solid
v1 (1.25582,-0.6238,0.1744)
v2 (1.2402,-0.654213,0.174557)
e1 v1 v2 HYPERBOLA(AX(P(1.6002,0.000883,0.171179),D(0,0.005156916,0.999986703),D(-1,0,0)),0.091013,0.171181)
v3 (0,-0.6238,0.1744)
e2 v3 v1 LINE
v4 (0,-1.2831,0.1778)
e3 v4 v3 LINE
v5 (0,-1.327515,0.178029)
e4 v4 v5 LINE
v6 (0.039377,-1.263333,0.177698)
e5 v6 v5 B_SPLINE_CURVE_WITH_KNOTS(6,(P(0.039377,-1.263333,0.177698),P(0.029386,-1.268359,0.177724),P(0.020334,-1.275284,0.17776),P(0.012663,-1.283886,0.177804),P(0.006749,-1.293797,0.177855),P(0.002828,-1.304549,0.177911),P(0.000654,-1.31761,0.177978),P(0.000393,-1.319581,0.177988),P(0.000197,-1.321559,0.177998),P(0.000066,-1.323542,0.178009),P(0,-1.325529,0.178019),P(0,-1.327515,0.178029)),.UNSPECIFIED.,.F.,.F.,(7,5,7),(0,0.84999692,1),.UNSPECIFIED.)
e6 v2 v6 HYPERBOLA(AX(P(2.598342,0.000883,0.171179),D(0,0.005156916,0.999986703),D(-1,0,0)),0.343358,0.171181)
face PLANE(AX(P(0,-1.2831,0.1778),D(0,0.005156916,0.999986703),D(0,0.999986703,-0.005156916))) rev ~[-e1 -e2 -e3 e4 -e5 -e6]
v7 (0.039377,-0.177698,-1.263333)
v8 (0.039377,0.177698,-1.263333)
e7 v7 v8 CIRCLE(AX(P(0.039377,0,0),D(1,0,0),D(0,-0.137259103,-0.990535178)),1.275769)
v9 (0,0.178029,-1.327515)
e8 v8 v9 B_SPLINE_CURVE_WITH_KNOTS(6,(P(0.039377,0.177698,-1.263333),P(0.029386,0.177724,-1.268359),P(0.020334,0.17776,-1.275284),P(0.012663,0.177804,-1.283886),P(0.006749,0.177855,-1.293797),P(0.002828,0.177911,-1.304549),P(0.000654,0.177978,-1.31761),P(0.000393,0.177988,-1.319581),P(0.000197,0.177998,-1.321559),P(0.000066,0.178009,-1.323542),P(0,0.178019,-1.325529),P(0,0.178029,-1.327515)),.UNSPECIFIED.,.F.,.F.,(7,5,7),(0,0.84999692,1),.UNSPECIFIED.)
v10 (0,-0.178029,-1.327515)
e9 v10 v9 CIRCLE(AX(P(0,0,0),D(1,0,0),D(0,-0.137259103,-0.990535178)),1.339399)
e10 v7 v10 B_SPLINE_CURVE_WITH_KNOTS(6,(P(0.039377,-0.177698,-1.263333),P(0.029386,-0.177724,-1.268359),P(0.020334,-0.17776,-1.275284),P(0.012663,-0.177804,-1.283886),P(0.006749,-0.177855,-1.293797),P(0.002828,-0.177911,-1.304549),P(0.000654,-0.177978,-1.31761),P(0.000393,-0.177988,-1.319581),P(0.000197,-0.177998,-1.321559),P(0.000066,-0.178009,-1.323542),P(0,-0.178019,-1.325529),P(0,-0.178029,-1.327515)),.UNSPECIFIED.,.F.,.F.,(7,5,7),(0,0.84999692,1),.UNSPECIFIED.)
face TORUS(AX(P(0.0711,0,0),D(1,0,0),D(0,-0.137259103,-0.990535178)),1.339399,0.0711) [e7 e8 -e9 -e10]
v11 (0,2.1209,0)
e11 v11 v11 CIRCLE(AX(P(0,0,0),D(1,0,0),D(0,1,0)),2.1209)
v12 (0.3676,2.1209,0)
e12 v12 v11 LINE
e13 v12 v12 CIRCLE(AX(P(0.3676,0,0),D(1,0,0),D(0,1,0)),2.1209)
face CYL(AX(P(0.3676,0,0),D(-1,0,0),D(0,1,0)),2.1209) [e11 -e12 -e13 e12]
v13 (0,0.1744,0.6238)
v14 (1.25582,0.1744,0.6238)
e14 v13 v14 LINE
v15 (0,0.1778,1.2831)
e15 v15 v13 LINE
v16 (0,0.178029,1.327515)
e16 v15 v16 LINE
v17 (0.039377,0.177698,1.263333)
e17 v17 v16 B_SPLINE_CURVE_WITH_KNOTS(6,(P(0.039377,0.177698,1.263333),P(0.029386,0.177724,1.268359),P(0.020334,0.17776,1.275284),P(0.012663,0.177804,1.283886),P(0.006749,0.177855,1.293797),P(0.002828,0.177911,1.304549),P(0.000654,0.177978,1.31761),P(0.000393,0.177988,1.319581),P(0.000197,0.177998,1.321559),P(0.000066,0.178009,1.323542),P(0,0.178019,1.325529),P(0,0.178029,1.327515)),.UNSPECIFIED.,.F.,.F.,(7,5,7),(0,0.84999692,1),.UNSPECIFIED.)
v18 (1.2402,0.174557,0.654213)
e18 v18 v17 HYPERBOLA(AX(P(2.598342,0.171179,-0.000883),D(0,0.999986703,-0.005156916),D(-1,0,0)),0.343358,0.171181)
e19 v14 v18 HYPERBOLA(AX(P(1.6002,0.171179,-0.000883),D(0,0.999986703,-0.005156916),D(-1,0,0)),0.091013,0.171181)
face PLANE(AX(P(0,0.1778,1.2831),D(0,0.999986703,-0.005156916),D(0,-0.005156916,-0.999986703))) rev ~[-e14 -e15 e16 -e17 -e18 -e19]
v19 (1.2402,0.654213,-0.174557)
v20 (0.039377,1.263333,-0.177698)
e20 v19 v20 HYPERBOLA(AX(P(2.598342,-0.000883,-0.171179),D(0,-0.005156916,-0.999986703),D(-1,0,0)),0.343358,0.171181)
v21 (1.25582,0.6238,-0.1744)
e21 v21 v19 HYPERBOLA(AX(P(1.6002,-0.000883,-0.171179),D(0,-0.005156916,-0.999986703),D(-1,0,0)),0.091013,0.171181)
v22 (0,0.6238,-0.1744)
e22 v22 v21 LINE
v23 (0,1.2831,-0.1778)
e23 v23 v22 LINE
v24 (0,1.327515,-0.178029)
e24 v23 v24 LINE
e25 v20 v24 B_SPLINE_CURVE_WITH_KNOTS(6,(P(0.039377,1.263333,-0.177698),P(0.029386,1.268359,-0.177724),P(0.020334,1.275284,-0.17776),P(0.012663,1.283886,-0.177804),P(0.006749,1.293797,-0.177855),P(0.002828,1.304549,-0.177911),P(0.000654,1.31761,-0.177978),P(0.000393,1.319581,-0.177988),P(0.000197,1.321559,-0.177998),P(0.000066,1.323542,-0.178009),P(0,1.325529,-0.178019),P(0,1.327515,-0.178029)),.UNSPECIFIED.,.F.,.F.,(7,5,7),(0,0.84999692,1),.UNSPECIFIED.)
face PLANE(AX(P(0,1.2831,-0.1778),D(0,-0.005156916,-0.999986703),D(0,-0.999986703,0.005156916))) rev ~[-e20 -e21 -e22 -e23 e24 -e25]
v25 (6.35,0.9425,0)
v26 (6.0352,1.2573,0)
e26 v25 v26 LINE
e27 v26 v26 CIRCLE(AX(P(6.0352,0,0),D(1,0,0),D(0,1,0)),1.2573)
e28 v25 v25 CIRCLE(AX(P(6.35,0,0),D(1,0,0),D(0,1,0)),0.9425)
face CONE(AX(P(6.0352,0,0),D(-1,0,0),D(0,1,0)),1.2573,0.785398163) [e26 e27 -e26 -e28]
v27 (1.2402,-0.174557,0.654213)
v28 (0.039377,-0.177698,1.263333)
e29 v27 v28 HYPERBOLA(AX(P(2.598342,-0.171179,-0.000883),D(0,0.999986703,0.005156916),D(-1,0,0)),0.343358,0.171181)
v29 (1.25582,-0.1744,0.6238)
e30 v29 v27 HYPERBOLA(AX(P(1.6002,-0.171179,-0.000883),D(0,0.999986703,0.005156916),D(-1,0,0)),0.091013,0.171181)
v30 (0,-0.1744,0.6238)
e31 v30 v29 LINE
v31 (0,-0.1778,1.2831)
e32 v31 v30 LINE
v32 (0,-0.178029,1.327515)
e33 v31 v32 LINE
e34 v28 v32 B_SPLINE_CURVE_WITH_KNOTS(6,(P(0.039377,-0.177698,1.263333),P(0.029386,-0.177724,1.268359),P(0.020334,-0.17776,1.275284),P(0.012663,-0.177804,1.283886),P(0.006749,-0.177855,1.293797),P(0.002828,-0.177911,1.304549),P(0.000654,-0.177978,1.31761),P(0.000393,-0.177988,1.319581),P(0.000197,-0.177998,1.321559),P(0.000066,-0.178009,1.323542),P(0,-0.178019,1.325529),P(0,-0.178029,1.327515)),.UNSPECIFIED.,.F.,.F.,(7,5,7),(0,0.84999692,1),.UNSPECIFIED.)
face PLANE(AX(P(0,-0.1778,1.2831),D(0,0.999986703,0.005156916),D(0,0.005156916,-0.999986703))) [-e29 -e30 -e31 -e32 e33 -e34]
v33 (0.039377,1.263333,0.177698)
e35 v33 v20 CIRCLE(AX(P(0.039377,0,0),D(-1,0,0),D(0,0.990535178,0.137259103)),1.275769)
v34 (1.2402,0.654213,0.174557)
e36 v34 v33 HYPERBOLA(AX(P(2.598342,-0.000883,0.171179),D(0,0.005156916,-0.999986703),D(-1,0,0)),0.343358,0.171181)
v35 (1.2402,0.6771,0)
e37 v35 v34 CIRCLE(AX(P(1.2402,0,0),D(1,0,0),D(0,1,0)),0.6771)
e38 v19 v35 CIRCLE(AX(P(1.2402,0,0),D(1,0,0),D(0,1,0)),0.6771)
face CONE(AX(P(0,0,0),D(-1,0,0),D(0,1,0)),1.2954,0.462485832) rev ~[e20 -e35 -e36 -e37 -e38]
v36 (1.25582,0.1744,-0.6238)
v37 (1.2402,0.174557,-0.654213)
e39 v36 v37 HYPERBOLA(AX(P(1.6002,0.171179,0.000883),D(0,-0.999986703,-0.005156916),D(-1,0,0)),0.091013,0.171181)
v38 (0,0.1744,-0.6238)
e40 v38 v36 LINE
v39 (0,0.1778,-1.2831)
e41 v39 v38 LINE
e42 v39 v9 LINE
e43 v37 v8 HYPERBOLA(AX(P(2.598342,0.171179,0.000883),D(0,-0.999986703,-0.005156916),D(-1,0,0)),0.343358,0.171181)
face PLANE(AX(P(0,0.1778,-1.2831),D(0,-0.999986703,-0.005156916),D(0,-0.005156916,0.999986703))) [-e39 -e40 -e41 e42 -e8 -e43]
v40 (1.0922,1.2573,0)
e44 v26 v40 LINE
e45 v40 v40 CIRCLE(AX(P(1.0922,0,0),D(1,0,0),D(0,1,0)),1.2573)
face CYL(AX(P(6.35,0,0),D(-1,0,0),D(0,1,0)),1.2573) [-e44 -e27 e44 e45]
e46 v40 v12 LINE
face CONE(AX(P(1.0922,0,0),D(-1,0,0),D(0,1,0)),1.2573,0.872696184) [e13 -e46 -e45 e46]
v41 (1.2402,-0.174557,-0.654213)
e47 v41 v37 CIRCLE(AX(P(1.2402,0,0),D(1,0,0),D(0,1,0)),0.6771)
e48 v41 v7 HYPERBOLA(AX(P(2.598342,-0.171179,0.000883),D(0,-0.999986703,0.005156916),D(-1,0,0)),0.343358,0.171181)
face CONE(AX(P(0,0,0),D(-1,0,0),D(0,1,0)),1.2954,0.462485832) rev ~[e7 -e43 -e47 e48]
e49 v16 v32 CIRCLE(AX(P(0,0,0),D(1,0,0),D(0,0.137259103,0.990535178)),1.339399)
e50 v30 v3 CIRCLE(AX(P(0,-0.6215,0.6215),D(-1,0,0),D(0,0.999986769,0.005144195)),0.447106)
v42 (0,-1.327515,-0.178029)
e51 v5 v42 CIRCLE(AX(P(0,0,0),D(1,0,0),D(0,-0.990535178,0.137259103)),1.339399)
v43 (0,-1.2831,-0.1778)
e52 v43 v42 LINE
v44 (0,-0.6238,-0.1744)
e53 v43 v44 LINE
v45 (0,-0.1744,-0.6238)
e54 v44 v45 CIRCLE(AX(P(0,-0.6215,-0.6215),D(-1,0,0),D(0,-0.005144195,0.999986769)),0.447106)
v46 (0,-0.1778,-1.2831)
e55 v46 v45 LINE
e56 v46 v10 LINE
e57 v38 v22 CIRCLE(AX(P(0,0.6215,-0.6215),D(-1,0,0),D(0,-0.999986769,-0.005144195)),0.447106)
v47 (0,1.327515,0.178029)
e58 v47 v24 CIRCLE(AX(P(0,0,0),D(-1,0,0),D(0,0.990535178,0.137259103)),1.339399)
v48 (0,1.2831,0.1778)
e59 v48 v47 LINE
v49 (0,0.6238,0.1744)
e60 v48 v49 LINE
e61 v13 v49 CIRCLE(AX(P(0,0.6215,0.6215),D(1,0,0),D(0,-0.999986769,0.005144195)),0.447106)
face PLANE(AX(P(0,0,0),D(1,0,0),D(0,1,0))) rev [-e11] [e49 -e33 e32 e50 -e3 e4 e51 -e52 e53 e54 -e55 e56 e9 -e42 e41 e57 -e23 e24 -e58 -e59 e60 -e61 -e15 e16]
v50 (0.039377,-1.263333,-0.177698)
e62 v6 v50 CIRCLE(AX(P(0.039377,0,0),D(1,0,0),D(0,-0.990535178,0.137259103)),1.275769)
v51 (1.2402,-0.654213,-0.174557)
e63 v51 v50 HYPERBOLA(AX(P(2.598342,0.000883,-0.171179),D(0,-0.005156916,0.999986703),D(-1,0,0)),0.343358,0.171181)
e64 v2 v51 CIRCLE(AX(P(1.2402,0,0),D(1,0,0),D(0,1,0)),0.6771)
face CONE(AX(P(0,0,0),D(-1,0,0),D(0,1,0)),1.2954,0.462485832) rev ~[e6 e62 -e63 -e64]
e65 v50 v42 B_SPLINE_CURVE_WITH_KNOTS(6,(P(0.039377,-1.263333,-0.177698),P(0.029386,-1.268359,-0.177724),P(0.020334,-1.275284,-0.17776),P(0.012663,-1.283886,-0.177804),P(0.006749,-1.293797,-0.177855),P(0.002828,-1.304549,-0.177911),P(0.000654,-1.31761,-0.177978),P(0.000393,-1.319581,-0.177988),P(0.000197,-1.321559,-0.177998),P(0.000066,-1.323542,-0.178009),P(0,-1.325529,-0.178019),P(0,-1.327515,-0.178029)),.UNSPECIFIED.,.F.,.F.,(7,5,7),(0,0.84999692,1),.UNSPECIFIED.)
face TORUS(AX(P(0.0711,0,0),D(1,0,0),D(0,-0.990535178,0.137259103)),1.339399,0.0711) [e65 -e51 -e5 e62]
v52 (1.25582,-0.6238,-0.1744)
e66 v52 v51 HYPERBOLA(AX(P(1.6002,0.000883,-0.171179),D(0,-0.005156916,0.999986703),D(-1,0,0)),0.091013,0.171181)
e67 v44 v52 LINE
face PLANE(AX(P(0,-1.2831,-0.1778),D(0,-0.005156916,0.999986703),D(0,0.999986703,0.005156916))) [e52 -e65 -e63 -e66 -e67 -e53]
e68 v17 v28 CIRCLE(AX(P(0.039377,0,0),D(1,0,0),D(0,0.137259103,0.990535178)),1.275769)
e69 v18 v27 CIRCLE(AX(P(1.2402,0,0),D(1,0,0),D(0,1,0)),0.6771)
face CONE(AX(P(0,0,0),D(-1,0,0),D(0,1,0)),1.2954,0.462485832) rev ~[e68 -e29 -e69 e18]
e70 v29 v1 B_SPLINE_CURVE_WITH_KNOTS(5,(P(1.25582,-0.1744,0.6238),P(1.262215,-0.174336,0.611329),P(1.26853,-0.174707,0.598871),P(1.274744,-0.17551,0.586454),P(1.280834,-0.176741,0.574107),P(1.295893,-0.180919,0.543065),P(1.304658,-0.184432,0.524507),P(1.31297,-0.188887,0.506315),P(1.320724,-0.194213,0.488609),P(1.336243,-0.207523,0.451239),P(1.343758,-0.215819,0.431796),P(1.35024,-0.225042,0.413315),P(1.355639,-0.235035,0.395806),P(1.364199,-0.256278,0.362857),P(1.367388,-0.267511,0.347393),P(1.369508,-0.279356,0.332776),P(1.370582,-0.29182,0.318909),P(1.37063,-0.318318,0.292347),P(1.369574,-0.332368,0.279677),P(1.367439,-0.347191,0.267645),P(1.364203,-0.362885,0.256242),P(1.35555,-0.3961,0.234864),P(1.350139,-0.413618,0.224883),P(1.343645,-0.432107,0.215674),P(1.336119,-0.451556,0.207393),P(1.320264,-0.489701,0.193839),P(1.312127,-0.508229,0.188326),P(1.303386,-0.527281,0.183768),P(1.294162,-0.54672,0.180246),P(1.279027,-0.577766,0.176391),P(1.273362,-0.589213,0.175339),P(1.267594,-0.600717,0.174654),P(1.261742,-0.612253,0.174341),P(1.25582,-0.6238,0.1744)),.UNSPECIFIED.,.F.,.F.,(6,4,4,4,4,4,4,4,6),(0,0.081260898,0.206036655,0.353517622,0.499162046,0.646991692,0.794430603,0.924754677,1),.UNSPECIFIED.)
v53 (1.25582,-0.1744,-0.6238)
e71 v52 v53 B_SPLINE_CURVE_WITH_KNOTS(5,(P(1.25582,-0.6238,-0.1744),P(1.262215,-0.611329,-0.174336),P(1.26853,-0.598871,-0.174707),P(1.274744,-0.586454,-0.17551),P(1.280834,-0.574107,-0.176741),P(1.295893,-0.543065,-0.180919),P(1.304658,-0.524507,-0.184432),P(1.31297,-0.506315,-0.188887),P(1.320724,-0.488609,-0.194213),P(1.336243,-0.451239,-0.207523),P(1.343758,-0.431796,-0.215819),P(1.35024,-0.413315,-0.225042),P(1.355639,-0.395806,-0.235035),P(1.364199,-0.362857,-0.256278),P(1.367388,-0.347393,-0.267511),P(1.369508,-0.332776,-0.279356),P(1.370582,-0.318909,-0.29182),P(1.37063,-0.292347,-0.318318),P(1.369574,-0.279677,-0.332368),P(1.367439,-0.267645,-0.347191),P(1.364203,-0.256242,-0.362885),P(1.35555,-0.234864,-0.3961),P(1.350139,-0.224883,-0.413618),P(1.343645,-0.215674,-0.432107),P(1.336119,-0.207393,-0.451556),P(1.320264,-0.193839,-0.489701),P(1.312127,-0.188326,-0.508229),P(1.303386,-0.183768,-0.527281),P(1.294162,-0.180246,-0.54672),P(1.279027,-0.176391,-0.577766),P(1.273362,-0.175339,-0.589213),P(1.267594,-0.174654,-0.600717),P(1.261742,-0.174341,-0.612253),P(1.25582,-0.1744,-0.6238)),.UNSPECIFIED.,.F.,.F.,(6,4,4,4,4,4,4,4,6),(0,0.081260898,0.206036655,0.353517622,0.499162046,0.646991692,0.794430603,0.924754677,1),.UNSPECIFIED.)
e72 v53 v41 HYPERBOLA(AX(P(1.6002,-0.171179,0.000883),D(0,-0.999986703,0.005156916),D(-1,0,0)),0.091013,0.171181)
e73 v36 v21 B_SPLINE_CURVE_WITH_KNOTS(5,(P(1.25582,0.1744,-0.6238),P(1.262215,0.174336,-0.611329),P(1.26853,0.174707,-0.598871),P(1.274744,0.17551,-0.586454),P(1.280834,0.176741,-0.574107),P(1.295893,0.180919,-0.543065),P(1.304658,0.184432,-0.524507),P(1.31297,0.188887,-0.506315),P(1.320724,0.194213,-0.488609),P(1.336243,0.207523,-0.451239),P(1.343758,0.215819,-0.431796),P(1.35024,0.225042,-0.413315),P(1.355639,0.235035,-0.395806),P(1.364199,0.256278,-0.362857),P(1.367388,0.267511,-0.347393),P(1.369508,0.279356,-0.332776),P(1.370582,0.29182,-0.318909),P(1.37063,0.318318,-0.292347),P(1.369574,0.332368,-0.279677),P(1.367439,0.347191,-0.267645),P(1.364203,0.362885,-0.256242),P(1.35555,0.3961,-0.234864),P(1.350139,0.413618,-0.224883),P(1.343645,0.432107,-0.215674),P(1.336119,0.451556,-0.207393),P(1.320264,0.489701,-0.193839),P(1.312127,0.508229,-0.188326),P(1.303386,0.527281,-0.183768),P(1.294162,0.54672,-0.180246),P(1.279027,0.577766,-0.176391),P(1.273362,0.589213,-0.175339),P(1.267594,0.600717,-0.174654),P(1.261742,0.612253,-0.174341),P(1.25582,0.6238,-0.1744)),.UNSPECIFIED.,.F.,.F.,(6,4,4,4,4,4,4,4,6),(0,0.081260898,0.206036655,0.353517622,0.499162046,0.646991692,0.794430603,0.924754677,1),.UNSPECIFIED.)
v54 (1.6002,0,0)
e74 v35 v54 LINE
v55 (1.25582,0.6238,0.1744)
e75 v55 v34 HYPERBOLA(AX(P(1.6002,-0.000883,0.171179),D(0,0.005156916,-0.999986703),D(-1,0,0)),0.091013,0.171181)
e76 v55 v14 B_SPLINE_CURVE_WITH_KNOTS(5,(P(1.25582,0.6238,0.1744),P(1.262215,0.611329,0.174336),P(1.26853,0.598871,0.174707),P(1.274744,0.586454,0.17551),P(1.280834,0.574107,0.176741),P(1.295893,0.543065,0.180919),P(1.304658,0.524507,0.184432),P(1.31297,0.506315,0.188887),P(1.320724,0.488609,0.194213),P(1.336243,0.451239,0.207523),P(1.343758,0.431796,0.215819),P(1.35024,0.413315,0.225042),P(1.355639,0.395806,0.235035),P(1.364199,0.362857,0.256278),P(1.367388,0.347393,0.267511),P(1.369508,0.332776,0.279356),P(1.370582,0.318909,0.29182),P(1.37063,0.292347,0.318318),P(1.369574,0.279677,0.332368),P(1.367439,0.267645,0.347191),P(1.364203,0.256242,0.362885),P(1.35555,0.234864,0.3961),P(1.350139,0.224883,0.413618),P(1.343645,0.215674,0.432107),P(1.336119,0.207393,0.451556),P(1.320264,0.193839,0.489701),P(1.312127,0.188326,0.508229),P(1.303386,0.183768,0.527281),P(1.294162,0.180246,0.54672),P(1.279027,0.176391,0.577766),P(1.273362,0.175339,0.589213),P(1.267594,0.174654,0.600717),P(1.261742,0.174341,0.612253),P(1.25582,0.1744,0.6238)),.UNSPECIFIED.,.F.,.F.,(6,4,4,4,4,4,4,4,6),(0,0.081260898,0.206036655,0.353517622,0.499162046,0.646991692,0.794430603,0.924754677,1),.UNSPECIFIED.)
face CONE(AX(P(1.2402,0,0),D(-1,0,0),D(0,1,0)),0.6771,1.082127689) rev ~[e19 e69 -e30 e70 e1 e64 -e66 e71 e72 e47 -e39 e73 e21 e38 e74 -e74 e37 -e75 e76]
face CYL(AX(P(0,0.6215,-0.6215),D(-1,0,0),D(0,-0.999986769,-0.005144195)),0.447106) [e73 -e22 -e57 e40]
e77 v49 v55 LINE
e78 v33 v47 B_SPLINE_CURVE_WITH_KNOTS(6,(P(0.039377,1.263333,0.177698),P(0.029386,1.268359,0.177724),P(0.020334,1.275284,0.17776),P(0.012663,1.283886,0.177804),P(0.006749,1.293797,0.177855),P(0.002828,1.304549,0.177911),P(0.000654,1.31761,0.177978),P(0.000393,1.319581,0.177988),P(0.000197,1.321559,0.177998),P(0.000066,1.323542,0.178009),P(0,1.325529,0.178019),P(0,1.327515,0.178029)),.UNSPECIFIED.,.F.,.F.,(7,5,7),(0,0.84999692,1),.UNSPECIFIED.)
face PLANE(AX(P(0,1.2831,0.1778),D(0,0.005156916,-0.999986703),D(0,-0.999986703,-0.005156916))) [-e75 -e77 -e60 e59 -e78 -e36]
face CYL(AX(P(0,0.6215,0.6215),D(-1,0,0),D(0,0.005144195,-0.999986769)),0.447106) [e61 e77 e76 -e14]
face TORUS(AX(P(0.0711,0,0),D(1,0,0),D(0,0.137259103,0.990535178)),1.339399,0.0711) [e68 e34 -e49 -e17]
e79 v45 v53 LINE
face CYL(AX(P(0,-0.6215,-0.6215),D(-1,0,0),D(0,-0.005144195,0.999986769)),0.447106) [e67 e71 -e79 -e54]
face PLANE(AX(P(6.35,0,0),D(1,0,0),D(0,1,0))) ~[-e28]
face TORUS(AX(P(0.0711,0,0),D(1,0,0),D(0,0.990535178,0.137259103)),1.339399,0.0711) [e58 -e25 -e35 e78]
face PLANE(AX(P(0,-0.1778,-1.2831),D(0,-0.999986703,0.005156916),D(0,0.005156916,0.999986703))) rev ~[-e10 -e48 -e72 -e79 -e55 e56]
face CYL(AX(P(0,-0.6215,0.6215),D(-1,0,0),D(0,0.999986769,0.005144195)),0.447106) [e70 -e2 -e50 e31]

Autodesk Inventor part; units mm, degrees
ref_plane "YZ Plane" through (0, 0, 0) normal (1, 0, 0) x (0, 1, 0)
ref_plane "XZ Plane" through (0, 0, 0) normal (0, 1, 0) x (-1, 0, 0)
sketch "Sketch1" plane through (0, 0, 0) normal (0, 0, 1) x (1, 0, 0)
  line L0 (1.6002, 0) -> (6.35, 0)
  line L1 (6.35, 0) -> (6.35, 1.2573)
  line L2 (6.35, 1.2573) -> (1.0922, 1.2573)
  line L3 (0.3676, 2.1209) -> (0, 2.1209)
  line L4 (-1.27, 0) -> (7.62, 0) projected
  line L5 (0, -0.4242) -> (0, 2.5451) projected
  line L6 (0, 1.2954) -> (1.2402, 0.6771)
  line L7 (1.2402, 0.6771) -> (1.6002, 0)
  line L8 (1.0922, 1.2573) -> (0.3676, 2.1209)
  line L9 (0, 2.1209) -> (0, 1.2954)
  dimension "d2" = 2.5146
  dimension "d3" = 4.2418
  dimension "d4" = 1.6002
  dimension "d5" = 2.5908
  dimension "d6" = 26.5
  dimension "d7" = 62
  dimension "d13" = 50
  dimension "d14" = 1.0922
  dimension "d15" = 6.35
revolve "Body" add sketch "Sketch1" angle 360 about axis through (1.6002, 0, 0) along (1, 0, 0) contours L7 L6 L5 L3 L8 L2 L1 L0
sketch "Sketch2" plane through (0, 0, 0) normal (-1, 0, 0) x (0, 0, 1)
  line L0 (0, -2.9693) -> (0, 2.9693) projected
  line L1 (-2.9693, 0) -> (2.9693, 0) projected
  line L2 (0, 1.2954) -> (0, 0) construction
  line L3 (0, 0) -> (1.2954, 0) construction
  arc A0 (0.4318, 0) -> (0, 0.4318) centre (0, 0) ccw
  line L4 (0, 0) -> (0.7947, 0.7947) construction
  arc A1 (0.6477, 0) -> (0, 0.6477) centre (0, 0) ccw construction
  line L5 (0.1778, 1.2831) -> (0.1744, 0.6238)
  line L6 (1.2831, 0.1778) -> (0.6238, 0.1744)
  arc A2 (0.1744, 0.6238) -> (0.6238, 0.1744) centre (0.6215, 0.6215) ccw
  arc A3 (1.2954, 0) -> (1.2831, 0.1778) centre (0, 0) ccw
  arc A4 (0.1778, 1.2831) -> (0, 1.2954) centre (0, 0) ccw
  arc A5 (1.2831, 0.1778) -> (0.1778, 1.2831) centre (0, 0) ccw
  line L7 (0.1778, -1.2831) -> (0.1744, -0.6238)
  line L8 (1.2831, -0.1778) -> (0.6238, -0.1744)
  arc A6 (0.6238, -0.1744) -> (0.1744, -0.6238) centre (0.6215, -0.6215) ccw
  arc A7 (1.2831, -0.1778) -> (1.2954, 0) centre (0, 0) ccw
  arc A8 (0, -1.2954) -> (0.1778, -1.2831) centre (0, 0) ccw
  arc A9 (0.1778, -1.2831) -> (1.2831, -0.1778) centre (0, 0) ccw
  line L9 (-0.1778, 1.2831) -> (-0.1744, 0.6238)
  line L10 (-1.2831, 0.1778) -> (-0.6238, 0.1744)
  arc A10 (-0.6238, 0.1744) -> (-0.1744, 0.6238) centre (-0.6215, 0.6215) ccw
  arc A11 (-1.2831, 0.1778) -> (-1.2954, 0) centre (0, 0) ccw
  arc A12 (0, 1.2954) -> (-0.1778, 1.2831) centre (0, 0) ccw
  arc A13 (-0.1778, 1.2831) -> (-1.2831, 0.1778) centre (0, 0) ccw
  arc A14 (-1.2831, -0.1778) -> (-0.1778, -1.2831) centre (0, 0) ccw
  arc A15 (-0.1778, -1.2831) -> (0, -1.2954) centre (0, 0) ccw
  arc A16 (-1.2954, 0) -> (-1.2831, -0.1778) centre (0, 0) ccw
  line L11 (-1.2831, -0.1778) -> (-0.6238, -0.1744)
  arc A17 (-0.1744, -0.6238) -> (-0.6238, -0.1744) centre (-0.6215, -0.6215) ccw
  line L12 (-0.1778, -1.2831) -> (-0.1744, -0.6238)
  dimension "d18" = 45
  dimension "d19" = 0.8636
  dimension "d20" = 1.2954
  dimension "d21" = 2.5908
  dimension "d22" = 0.1778
extrude "Slot" add sketch "Sketch2" against normal up to next contours A2 L5 A5 L6 | L9 A10 L10 A13 | L7 A6 L8 A9 | A14 L11 A17 L12
fillet "Fillet1" radius 0.0711 4 edges at (0, 1.2954, 0) (0, 0, 1.2954) (0, -1.2954, 0) (0, 0, -1.2954)
thread "Thread" size "3-48 UNC" class "2A" standard "ANSI Unified Screw Threads" length 3.9349
chamfer "Chamfer1" distance 0.3148 distance2 0.3148 1 edges at (6.35, -1.2573, 0) measured on face at (6.35, -0.6343, -0.3329)
ref_plane "Work Plane2" through (2.032, 0, 0) normal (0, 1, 0) x (1, 0, 0)
equation "\"d2\" = GD"
equation "\"d3\" = KOD"
equation "\"d4\" = INTI"
equation "\"d5\" = SDM"
equation "\"d13\" = 0.5 * SEWI"
equation "\"d14\" = KOH"
equation "\"d15\" = NLG"
equation "\"d19\" = 0.333333 * SDM"
equation "\"d20\" = 0.5 * SDM"
equation "\"d21\" = SDM"
equation "\"d22\" = 0.5 * SBR"
equation "\"d45\" = INTI"
equation "\"d25\" = 0.2 * SBR"
equation "\"d9\" = GEL"
equation "\"d11\" = -0.5 * SPD + 0.5 * GD"
equation "\"d12\" = GUL"
equation "\"GD\" = NND"
equation "\"NLG\" = 6.35"
equation "\"GEL\" = 3.9349"
equation "\"KOD\" = 4.2418"
equation "\"KOH\" = 1.0922"
equation "\"SDM\" = 2.5908"
equation "\"INTI\" = 1.6002"
equation "\"SBR\" = 0.3556"
equation "\"GUL\" = -0.5 * SPD + 0.5 * NND"
equation "\"SPD\" = 1.8849"
equation "\"SEWI\" = 100deg"
equation "\"d0\" = NLG"
equation "\"d1\" = KOH"
equation "\"d17\" = SDM"
equation "\"TOA\" = 30deg"
equation "\"EPV\" = 2.1472"
equation "\"THREADDIA\" = 2.5146"
equation "\"BDM\" = NND"
equation "\"NND\" = 2.5146"
equation "\"GAL\" = 0.52916"
equation "\"GD1\" = SPD"
properties part number "ANSI B18.6.3 - 3-48 UNC x 0,25" material "Steel, Mild"
